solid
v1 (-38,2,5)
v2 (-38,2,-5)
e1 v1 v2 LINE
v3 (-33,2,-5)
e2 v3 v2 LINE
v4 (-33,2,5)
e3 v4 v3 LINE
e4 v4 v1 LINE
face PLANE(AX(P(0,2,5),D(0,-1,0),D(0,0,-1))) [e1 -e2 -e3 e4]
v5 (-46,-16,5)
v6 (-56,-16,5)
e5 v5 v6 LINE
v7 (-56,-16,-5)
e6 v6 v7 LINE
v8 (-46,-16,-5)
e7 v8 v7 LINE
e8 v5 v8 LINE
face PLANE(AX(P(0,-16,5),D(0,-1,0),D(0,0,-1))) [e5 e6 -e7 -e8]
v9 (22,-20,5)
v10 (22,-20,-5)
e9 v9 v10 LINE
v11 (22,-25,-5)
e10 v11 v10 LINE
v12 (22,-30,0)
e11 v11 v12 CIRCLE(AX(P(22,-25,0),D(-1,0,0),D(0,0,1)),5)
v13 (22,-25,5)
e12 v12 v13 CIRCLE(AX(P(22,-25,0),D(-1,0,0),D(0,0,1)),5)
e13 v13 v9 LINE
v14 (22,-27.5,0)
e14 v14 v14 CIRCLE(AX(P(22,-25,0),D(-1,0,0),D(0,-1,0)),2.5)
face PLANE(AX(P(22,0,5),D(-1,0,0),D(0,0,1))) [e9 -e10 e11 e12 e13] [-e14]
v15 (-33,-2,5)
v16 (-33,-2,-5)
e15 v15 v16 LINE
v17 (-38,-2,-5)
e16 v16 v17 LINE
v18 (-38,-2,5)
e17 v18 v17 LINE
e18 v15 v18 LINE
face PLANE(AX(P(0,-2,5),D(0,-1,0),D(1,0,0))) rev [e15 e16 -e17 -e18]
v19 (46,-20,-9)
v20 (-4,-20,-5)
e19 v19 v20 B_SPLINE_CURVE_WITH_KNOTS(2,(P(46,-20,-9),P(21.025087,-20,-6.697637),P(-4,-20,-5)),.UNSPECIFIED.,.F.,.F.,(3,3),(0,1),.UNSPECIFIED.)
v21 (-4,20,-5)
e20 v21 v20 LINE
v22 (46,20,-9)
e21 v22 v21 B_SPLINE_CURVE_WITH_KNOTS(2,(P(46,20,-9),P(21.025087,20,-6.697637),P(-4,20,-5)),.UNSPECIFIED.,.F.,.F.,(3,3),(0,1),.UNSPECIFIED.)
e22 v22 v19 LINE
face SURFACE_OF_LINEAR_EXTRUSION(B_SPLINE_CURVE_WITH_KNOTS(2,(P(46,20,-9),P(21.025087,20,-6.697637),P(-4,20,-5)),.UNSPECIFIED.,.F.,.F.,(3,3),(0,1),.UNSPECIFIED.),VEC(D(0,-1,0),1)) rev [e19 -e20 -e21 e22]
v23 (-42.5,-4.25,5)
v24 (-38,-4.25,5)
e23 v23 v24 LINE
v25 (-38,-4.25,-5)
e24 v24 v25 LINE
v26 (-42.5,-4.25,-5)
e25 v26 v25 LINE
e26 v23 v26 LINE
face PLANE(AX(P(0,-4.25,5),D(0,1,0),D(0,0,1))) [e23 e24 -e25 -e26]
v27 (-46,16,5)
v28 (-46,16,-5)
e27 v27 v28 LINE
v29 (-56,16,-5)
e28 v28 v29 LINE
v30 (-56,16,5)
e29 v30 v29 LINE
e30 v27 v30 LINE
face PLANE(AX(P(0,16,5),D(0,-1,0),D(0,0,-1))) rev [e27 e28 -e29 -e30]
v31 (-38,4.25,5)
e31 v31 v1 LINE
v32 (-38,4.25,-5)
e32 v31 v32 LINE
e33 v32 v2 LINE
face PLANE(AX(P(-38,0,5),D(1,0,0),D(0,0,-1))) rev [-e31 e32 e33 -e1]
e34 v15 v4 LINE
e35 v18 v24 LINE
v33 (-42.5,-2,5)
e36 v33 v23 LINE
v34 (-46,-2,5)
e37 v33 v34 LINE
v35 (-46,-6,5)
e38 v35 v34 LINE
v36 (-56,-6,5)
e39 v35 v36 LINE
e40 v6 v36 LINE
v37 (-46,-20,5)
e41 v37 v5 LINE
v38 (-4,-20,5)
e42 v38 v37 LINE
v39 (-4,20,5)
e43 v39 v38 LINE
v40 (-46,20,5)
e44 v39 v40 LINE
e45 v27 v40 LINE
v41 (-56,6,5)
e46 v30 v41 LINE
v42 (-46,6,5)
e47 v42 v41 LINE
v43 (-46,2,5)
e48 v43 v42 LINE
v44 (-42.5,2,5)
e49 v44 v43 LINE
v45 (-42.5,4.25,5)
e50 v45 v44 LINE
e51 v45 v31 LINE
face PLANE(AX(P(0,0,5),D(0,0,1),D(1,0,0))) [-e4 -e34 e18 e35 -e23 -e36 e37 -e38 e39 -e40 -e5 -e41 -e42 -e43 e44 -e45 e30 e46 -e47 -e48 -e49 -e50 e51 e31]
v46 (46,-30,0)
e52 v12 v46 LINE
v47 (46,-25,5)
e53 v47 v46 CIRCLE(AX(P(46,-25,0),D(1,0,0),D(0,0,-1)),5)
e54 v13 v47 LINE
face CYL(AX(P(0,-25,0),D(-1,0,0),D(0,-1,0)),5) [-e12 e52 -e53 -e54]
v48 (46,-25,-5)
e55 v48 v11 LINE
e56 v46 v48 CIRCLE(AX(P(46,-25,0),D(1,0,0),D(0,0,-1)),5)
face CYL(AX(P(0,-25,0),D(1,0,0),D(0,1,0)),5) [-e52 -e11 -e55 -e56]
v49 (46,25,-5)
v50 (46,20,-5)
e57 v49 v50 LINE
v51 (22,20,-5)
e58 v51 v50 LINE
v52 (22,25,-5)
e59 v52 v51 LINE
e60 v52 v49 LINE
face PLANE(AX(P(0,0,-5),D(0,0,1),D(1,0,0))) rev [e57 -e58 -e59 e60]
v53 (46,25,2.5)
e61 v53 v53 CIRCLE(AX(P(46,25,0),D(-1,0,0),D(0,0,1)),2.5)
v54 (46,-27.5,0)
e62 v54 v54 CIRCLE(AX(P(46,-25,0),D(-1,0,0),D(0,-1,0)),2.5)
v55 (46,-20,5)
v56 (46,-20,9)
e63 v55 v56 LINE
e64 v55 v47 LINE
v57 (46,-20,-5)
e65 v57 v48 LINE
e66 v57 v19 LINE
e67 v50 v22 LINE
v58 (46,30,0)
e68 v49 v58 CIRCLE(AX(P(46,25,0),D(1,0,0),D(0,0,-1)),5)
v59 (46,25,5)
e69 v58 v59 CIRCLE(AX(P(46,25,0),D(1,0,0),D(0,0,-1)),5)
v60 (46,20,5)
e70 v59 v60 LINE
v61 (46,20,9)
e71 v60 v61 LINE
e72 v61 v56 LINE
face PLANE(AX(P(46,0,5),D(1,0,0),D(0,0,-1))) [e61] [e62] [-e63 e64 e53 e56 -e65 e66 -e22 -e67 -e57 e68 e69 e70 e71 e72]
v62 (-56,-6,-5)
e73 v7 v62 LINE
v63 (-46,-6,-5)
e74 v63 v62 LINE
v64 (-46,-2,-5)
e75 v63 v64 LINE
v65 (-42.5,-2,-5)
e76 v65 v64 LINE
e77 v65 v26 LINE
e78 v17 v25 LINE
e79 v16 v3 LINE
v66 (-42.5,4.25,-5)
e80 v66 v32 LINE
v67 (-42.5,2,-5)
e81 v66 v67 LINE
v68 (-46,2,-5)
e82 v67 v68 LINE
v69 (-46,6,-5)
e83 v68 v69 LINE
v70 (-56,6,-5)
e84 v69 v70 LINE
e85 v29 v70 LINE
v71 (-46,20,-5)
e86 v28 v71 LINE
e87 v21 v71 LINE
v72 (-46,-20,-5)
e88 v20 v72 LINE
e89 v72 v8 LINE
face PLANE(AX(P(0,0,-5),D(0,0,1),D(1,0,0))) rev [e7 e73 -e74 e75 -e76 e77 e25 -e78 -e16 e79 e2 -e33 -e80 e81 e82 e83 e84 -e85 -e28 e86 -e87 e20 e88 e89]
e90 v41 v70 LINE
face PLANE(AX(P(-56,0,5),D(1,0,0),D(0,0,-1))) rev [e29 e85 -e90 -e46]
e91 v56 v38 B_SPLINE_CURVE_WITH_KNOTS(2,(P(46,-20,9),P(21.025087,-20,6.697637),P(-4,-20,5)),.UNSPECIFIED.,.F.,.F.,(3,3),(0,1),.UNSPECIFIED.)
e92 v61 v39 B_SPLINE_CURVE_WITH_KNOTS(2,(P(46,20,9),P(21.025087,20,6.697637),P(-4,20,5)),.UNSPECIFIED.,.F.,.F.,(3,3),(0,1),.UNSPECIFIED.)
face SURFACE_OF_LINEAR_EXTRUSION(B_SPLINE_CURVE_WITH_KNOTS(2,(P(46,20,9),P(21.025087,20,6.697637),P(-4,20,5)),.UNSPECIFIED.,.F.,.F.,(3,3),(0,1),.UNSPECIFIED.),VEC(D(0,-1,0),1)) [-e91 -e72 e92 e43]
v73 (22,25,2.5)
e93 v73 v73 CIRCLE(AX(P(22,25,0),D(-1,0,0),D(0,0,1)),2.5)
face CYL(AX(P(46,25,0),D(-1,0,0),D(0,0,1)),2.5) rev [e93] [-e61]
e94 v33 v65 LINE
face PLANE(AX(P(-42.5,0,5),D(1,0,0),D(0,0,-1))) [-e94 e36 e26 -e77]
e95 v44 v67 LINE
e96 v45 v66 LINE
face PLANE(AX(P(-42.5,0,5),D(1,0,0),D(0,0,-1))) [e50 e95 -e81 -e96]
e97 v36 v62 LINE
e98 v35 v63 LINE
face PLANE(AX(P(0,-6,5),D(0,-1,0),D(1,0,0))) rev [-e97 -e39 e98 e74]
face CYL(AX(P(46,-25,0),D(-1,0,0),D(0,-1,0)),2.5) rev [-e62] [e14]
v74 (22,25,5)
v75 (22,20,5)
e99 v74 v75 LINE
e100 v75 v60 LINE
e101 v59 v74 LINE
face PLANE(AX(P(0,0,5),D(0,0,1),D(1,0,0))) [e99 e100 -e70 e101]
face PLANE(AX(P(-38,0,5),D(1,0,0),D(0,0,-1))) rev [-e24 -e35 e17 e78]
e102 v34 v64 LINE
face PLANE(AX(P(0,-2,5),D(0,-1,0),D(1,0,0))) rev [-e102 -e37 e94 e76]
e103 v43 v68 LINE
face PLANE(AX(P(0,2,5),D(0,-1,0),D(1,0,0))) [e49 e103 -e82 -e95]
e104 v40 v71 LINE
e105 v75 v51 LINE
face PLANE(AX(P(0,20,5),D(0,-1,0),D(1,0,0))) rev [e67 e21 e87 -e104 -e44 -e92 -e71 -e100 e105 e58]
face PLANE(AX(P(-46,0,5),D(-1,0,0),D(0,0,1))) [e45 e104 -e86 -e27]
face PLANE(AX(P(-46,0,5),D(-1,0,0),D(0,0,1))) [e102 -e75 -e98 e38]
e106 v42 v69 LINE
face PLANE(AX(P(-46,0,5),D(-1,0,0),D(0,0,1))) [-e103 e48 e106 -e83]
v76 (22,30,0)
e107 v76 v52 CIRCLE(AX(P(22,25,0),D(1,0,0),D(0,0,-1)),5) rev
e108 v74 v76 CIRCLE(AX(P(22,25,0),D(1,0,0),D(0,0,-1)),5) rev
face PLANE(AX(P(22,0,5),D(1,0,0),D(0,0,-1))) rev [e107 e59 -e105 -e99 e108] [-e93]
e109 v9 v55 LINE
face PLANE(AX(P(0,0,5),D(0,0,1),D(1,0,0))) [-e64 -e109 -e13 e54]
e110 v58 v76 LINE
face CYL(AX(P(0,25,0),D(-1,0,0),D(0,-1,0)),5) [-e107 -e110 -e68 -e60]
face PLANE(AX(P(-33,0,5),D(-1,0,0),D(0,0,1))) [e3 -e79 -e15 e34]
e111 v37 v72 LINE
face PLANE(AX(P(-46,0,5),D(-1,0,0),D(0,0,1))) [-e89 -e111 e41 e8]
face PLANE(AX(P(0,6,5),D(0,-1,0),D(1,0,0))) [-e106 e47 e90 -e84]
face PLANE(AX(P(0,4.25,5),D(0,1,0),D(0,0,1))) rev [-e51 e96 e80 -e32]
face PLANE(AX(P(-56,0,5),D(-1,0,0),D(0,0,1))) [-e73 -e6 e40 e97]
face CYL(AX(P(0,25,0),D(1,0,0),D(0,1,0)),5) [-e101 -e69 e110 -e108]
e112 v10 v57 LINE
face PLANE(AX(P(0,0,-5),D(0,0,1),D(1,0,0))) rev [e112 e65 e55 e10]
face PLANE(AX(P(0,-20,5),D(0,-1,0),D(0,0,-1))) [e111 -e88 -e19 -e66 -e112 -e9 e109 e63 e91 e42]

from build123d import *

# Parameters (mm, degrees)
BOSS_EXTRUDE1_DEPTH         = 5
SKETCH2_R                   = 2.5
CUT_EXTRUDE1_DEPTH          = 84.719770664
SKETCH3_R                   = 2.5
CUT_EXTRUDE2_DEPTH          = 84.719770664
FILLET1_R                   = 5
Y_KSEKLIK_EKSTR_ZYON1_DEPTH = 20


with BuildPart() as part:
    # Sketch1 → Boss-Extrude1 (new, symmetric)
    with BuildSketch(Plane.XY):
        Polygon((-42.5, 4.25), (-38, 4.25), (-38, 2), (-33, 2), (-33, -2), (-38, -2), (-38, -4.25), (-42.5, -4.25), (-42.5, -2), (-46, -2), (-46, -6), (-56, -6), (-56, -16), (-46, -16), (-46, -20), (22, -20), (22, -30), (46, -30), (46, -20), (46, -16), (46, -6), (46, -2), (46, 2), (46, 6), (46, 16), (46, 20), (46, 30), (22, 30), (22, 20), (-46, 20), (-46, 16), (-56, 16), (-56, 6), (-46, 6), (-46, 2), (-42.5, 2), align=None)
    extrude(amount=BOSS_EXTRUDE1_DEPTH, both=True)

    # Sketch2 → Cut-Extrude1 (cut, through all)
    with BuildSketch(Plane.ZY.offset(-22)):
        with Locations(Location((0, -25, 0), (0, 0, 270))):
            Circle(SKETCH2_R)
    extrude(amount=-CUT_EXTRUDE1_DEPTH, mode=Mode.SUBTRACT)

    # Sketch3 → Cut-Extrude2 (cut, through all)
    with BuildSketch(Plane.ZY.offset(-22)):
        with Locations((0, 25)):
            Circle(SKETCH3_R)
    extrude(amount=-CUT_EXTRUDE2_DEPTH, mode=Mode.SUBTRACT)

    # Fillet1
    fillet1_edges = [part.edges().sort_by_distance(p)[0] for p in [
        (34, -30, 5),
        (34, -30, -5),
        (34, 30, 5),
        (34, 30, -5),
    ]]
    fillet(fillet1_edges, radius=FILLET1_R - 0.0001)  # a hair under: the kernel refuses the full size

    # Çizim2 → Yükseklik-Ekstrüzyon1 (add, symmetric)
    with BuildSketch(Plane(origin=(0, 0, 0), x_dir=(1, 0, 0), z_dir=(0, 1, 0))):
        with BuildLine():
            Line((46, 5), (-4, 5))
            add(Edge.make_bspline(
                [(-4, 5), (21.025086812, 6.697636519), (46, 9)],
                knots=[0, 0, 0, 1, 1, 1], degree=2))
            Line((46, 9), (46, 5))
        make_face()
    y_kseklik_ekstr_zyon1 = extrude(amount=Y_KSEKLIK_EKSTR_ZYON1_DEPTH, both=True)

    # Mirror1: Yükseklik-Ekstrüzyon1 across plane
    add(y_kseklik_ekstr_zyon1.mirror(Plane.XY))


solid = part.part
